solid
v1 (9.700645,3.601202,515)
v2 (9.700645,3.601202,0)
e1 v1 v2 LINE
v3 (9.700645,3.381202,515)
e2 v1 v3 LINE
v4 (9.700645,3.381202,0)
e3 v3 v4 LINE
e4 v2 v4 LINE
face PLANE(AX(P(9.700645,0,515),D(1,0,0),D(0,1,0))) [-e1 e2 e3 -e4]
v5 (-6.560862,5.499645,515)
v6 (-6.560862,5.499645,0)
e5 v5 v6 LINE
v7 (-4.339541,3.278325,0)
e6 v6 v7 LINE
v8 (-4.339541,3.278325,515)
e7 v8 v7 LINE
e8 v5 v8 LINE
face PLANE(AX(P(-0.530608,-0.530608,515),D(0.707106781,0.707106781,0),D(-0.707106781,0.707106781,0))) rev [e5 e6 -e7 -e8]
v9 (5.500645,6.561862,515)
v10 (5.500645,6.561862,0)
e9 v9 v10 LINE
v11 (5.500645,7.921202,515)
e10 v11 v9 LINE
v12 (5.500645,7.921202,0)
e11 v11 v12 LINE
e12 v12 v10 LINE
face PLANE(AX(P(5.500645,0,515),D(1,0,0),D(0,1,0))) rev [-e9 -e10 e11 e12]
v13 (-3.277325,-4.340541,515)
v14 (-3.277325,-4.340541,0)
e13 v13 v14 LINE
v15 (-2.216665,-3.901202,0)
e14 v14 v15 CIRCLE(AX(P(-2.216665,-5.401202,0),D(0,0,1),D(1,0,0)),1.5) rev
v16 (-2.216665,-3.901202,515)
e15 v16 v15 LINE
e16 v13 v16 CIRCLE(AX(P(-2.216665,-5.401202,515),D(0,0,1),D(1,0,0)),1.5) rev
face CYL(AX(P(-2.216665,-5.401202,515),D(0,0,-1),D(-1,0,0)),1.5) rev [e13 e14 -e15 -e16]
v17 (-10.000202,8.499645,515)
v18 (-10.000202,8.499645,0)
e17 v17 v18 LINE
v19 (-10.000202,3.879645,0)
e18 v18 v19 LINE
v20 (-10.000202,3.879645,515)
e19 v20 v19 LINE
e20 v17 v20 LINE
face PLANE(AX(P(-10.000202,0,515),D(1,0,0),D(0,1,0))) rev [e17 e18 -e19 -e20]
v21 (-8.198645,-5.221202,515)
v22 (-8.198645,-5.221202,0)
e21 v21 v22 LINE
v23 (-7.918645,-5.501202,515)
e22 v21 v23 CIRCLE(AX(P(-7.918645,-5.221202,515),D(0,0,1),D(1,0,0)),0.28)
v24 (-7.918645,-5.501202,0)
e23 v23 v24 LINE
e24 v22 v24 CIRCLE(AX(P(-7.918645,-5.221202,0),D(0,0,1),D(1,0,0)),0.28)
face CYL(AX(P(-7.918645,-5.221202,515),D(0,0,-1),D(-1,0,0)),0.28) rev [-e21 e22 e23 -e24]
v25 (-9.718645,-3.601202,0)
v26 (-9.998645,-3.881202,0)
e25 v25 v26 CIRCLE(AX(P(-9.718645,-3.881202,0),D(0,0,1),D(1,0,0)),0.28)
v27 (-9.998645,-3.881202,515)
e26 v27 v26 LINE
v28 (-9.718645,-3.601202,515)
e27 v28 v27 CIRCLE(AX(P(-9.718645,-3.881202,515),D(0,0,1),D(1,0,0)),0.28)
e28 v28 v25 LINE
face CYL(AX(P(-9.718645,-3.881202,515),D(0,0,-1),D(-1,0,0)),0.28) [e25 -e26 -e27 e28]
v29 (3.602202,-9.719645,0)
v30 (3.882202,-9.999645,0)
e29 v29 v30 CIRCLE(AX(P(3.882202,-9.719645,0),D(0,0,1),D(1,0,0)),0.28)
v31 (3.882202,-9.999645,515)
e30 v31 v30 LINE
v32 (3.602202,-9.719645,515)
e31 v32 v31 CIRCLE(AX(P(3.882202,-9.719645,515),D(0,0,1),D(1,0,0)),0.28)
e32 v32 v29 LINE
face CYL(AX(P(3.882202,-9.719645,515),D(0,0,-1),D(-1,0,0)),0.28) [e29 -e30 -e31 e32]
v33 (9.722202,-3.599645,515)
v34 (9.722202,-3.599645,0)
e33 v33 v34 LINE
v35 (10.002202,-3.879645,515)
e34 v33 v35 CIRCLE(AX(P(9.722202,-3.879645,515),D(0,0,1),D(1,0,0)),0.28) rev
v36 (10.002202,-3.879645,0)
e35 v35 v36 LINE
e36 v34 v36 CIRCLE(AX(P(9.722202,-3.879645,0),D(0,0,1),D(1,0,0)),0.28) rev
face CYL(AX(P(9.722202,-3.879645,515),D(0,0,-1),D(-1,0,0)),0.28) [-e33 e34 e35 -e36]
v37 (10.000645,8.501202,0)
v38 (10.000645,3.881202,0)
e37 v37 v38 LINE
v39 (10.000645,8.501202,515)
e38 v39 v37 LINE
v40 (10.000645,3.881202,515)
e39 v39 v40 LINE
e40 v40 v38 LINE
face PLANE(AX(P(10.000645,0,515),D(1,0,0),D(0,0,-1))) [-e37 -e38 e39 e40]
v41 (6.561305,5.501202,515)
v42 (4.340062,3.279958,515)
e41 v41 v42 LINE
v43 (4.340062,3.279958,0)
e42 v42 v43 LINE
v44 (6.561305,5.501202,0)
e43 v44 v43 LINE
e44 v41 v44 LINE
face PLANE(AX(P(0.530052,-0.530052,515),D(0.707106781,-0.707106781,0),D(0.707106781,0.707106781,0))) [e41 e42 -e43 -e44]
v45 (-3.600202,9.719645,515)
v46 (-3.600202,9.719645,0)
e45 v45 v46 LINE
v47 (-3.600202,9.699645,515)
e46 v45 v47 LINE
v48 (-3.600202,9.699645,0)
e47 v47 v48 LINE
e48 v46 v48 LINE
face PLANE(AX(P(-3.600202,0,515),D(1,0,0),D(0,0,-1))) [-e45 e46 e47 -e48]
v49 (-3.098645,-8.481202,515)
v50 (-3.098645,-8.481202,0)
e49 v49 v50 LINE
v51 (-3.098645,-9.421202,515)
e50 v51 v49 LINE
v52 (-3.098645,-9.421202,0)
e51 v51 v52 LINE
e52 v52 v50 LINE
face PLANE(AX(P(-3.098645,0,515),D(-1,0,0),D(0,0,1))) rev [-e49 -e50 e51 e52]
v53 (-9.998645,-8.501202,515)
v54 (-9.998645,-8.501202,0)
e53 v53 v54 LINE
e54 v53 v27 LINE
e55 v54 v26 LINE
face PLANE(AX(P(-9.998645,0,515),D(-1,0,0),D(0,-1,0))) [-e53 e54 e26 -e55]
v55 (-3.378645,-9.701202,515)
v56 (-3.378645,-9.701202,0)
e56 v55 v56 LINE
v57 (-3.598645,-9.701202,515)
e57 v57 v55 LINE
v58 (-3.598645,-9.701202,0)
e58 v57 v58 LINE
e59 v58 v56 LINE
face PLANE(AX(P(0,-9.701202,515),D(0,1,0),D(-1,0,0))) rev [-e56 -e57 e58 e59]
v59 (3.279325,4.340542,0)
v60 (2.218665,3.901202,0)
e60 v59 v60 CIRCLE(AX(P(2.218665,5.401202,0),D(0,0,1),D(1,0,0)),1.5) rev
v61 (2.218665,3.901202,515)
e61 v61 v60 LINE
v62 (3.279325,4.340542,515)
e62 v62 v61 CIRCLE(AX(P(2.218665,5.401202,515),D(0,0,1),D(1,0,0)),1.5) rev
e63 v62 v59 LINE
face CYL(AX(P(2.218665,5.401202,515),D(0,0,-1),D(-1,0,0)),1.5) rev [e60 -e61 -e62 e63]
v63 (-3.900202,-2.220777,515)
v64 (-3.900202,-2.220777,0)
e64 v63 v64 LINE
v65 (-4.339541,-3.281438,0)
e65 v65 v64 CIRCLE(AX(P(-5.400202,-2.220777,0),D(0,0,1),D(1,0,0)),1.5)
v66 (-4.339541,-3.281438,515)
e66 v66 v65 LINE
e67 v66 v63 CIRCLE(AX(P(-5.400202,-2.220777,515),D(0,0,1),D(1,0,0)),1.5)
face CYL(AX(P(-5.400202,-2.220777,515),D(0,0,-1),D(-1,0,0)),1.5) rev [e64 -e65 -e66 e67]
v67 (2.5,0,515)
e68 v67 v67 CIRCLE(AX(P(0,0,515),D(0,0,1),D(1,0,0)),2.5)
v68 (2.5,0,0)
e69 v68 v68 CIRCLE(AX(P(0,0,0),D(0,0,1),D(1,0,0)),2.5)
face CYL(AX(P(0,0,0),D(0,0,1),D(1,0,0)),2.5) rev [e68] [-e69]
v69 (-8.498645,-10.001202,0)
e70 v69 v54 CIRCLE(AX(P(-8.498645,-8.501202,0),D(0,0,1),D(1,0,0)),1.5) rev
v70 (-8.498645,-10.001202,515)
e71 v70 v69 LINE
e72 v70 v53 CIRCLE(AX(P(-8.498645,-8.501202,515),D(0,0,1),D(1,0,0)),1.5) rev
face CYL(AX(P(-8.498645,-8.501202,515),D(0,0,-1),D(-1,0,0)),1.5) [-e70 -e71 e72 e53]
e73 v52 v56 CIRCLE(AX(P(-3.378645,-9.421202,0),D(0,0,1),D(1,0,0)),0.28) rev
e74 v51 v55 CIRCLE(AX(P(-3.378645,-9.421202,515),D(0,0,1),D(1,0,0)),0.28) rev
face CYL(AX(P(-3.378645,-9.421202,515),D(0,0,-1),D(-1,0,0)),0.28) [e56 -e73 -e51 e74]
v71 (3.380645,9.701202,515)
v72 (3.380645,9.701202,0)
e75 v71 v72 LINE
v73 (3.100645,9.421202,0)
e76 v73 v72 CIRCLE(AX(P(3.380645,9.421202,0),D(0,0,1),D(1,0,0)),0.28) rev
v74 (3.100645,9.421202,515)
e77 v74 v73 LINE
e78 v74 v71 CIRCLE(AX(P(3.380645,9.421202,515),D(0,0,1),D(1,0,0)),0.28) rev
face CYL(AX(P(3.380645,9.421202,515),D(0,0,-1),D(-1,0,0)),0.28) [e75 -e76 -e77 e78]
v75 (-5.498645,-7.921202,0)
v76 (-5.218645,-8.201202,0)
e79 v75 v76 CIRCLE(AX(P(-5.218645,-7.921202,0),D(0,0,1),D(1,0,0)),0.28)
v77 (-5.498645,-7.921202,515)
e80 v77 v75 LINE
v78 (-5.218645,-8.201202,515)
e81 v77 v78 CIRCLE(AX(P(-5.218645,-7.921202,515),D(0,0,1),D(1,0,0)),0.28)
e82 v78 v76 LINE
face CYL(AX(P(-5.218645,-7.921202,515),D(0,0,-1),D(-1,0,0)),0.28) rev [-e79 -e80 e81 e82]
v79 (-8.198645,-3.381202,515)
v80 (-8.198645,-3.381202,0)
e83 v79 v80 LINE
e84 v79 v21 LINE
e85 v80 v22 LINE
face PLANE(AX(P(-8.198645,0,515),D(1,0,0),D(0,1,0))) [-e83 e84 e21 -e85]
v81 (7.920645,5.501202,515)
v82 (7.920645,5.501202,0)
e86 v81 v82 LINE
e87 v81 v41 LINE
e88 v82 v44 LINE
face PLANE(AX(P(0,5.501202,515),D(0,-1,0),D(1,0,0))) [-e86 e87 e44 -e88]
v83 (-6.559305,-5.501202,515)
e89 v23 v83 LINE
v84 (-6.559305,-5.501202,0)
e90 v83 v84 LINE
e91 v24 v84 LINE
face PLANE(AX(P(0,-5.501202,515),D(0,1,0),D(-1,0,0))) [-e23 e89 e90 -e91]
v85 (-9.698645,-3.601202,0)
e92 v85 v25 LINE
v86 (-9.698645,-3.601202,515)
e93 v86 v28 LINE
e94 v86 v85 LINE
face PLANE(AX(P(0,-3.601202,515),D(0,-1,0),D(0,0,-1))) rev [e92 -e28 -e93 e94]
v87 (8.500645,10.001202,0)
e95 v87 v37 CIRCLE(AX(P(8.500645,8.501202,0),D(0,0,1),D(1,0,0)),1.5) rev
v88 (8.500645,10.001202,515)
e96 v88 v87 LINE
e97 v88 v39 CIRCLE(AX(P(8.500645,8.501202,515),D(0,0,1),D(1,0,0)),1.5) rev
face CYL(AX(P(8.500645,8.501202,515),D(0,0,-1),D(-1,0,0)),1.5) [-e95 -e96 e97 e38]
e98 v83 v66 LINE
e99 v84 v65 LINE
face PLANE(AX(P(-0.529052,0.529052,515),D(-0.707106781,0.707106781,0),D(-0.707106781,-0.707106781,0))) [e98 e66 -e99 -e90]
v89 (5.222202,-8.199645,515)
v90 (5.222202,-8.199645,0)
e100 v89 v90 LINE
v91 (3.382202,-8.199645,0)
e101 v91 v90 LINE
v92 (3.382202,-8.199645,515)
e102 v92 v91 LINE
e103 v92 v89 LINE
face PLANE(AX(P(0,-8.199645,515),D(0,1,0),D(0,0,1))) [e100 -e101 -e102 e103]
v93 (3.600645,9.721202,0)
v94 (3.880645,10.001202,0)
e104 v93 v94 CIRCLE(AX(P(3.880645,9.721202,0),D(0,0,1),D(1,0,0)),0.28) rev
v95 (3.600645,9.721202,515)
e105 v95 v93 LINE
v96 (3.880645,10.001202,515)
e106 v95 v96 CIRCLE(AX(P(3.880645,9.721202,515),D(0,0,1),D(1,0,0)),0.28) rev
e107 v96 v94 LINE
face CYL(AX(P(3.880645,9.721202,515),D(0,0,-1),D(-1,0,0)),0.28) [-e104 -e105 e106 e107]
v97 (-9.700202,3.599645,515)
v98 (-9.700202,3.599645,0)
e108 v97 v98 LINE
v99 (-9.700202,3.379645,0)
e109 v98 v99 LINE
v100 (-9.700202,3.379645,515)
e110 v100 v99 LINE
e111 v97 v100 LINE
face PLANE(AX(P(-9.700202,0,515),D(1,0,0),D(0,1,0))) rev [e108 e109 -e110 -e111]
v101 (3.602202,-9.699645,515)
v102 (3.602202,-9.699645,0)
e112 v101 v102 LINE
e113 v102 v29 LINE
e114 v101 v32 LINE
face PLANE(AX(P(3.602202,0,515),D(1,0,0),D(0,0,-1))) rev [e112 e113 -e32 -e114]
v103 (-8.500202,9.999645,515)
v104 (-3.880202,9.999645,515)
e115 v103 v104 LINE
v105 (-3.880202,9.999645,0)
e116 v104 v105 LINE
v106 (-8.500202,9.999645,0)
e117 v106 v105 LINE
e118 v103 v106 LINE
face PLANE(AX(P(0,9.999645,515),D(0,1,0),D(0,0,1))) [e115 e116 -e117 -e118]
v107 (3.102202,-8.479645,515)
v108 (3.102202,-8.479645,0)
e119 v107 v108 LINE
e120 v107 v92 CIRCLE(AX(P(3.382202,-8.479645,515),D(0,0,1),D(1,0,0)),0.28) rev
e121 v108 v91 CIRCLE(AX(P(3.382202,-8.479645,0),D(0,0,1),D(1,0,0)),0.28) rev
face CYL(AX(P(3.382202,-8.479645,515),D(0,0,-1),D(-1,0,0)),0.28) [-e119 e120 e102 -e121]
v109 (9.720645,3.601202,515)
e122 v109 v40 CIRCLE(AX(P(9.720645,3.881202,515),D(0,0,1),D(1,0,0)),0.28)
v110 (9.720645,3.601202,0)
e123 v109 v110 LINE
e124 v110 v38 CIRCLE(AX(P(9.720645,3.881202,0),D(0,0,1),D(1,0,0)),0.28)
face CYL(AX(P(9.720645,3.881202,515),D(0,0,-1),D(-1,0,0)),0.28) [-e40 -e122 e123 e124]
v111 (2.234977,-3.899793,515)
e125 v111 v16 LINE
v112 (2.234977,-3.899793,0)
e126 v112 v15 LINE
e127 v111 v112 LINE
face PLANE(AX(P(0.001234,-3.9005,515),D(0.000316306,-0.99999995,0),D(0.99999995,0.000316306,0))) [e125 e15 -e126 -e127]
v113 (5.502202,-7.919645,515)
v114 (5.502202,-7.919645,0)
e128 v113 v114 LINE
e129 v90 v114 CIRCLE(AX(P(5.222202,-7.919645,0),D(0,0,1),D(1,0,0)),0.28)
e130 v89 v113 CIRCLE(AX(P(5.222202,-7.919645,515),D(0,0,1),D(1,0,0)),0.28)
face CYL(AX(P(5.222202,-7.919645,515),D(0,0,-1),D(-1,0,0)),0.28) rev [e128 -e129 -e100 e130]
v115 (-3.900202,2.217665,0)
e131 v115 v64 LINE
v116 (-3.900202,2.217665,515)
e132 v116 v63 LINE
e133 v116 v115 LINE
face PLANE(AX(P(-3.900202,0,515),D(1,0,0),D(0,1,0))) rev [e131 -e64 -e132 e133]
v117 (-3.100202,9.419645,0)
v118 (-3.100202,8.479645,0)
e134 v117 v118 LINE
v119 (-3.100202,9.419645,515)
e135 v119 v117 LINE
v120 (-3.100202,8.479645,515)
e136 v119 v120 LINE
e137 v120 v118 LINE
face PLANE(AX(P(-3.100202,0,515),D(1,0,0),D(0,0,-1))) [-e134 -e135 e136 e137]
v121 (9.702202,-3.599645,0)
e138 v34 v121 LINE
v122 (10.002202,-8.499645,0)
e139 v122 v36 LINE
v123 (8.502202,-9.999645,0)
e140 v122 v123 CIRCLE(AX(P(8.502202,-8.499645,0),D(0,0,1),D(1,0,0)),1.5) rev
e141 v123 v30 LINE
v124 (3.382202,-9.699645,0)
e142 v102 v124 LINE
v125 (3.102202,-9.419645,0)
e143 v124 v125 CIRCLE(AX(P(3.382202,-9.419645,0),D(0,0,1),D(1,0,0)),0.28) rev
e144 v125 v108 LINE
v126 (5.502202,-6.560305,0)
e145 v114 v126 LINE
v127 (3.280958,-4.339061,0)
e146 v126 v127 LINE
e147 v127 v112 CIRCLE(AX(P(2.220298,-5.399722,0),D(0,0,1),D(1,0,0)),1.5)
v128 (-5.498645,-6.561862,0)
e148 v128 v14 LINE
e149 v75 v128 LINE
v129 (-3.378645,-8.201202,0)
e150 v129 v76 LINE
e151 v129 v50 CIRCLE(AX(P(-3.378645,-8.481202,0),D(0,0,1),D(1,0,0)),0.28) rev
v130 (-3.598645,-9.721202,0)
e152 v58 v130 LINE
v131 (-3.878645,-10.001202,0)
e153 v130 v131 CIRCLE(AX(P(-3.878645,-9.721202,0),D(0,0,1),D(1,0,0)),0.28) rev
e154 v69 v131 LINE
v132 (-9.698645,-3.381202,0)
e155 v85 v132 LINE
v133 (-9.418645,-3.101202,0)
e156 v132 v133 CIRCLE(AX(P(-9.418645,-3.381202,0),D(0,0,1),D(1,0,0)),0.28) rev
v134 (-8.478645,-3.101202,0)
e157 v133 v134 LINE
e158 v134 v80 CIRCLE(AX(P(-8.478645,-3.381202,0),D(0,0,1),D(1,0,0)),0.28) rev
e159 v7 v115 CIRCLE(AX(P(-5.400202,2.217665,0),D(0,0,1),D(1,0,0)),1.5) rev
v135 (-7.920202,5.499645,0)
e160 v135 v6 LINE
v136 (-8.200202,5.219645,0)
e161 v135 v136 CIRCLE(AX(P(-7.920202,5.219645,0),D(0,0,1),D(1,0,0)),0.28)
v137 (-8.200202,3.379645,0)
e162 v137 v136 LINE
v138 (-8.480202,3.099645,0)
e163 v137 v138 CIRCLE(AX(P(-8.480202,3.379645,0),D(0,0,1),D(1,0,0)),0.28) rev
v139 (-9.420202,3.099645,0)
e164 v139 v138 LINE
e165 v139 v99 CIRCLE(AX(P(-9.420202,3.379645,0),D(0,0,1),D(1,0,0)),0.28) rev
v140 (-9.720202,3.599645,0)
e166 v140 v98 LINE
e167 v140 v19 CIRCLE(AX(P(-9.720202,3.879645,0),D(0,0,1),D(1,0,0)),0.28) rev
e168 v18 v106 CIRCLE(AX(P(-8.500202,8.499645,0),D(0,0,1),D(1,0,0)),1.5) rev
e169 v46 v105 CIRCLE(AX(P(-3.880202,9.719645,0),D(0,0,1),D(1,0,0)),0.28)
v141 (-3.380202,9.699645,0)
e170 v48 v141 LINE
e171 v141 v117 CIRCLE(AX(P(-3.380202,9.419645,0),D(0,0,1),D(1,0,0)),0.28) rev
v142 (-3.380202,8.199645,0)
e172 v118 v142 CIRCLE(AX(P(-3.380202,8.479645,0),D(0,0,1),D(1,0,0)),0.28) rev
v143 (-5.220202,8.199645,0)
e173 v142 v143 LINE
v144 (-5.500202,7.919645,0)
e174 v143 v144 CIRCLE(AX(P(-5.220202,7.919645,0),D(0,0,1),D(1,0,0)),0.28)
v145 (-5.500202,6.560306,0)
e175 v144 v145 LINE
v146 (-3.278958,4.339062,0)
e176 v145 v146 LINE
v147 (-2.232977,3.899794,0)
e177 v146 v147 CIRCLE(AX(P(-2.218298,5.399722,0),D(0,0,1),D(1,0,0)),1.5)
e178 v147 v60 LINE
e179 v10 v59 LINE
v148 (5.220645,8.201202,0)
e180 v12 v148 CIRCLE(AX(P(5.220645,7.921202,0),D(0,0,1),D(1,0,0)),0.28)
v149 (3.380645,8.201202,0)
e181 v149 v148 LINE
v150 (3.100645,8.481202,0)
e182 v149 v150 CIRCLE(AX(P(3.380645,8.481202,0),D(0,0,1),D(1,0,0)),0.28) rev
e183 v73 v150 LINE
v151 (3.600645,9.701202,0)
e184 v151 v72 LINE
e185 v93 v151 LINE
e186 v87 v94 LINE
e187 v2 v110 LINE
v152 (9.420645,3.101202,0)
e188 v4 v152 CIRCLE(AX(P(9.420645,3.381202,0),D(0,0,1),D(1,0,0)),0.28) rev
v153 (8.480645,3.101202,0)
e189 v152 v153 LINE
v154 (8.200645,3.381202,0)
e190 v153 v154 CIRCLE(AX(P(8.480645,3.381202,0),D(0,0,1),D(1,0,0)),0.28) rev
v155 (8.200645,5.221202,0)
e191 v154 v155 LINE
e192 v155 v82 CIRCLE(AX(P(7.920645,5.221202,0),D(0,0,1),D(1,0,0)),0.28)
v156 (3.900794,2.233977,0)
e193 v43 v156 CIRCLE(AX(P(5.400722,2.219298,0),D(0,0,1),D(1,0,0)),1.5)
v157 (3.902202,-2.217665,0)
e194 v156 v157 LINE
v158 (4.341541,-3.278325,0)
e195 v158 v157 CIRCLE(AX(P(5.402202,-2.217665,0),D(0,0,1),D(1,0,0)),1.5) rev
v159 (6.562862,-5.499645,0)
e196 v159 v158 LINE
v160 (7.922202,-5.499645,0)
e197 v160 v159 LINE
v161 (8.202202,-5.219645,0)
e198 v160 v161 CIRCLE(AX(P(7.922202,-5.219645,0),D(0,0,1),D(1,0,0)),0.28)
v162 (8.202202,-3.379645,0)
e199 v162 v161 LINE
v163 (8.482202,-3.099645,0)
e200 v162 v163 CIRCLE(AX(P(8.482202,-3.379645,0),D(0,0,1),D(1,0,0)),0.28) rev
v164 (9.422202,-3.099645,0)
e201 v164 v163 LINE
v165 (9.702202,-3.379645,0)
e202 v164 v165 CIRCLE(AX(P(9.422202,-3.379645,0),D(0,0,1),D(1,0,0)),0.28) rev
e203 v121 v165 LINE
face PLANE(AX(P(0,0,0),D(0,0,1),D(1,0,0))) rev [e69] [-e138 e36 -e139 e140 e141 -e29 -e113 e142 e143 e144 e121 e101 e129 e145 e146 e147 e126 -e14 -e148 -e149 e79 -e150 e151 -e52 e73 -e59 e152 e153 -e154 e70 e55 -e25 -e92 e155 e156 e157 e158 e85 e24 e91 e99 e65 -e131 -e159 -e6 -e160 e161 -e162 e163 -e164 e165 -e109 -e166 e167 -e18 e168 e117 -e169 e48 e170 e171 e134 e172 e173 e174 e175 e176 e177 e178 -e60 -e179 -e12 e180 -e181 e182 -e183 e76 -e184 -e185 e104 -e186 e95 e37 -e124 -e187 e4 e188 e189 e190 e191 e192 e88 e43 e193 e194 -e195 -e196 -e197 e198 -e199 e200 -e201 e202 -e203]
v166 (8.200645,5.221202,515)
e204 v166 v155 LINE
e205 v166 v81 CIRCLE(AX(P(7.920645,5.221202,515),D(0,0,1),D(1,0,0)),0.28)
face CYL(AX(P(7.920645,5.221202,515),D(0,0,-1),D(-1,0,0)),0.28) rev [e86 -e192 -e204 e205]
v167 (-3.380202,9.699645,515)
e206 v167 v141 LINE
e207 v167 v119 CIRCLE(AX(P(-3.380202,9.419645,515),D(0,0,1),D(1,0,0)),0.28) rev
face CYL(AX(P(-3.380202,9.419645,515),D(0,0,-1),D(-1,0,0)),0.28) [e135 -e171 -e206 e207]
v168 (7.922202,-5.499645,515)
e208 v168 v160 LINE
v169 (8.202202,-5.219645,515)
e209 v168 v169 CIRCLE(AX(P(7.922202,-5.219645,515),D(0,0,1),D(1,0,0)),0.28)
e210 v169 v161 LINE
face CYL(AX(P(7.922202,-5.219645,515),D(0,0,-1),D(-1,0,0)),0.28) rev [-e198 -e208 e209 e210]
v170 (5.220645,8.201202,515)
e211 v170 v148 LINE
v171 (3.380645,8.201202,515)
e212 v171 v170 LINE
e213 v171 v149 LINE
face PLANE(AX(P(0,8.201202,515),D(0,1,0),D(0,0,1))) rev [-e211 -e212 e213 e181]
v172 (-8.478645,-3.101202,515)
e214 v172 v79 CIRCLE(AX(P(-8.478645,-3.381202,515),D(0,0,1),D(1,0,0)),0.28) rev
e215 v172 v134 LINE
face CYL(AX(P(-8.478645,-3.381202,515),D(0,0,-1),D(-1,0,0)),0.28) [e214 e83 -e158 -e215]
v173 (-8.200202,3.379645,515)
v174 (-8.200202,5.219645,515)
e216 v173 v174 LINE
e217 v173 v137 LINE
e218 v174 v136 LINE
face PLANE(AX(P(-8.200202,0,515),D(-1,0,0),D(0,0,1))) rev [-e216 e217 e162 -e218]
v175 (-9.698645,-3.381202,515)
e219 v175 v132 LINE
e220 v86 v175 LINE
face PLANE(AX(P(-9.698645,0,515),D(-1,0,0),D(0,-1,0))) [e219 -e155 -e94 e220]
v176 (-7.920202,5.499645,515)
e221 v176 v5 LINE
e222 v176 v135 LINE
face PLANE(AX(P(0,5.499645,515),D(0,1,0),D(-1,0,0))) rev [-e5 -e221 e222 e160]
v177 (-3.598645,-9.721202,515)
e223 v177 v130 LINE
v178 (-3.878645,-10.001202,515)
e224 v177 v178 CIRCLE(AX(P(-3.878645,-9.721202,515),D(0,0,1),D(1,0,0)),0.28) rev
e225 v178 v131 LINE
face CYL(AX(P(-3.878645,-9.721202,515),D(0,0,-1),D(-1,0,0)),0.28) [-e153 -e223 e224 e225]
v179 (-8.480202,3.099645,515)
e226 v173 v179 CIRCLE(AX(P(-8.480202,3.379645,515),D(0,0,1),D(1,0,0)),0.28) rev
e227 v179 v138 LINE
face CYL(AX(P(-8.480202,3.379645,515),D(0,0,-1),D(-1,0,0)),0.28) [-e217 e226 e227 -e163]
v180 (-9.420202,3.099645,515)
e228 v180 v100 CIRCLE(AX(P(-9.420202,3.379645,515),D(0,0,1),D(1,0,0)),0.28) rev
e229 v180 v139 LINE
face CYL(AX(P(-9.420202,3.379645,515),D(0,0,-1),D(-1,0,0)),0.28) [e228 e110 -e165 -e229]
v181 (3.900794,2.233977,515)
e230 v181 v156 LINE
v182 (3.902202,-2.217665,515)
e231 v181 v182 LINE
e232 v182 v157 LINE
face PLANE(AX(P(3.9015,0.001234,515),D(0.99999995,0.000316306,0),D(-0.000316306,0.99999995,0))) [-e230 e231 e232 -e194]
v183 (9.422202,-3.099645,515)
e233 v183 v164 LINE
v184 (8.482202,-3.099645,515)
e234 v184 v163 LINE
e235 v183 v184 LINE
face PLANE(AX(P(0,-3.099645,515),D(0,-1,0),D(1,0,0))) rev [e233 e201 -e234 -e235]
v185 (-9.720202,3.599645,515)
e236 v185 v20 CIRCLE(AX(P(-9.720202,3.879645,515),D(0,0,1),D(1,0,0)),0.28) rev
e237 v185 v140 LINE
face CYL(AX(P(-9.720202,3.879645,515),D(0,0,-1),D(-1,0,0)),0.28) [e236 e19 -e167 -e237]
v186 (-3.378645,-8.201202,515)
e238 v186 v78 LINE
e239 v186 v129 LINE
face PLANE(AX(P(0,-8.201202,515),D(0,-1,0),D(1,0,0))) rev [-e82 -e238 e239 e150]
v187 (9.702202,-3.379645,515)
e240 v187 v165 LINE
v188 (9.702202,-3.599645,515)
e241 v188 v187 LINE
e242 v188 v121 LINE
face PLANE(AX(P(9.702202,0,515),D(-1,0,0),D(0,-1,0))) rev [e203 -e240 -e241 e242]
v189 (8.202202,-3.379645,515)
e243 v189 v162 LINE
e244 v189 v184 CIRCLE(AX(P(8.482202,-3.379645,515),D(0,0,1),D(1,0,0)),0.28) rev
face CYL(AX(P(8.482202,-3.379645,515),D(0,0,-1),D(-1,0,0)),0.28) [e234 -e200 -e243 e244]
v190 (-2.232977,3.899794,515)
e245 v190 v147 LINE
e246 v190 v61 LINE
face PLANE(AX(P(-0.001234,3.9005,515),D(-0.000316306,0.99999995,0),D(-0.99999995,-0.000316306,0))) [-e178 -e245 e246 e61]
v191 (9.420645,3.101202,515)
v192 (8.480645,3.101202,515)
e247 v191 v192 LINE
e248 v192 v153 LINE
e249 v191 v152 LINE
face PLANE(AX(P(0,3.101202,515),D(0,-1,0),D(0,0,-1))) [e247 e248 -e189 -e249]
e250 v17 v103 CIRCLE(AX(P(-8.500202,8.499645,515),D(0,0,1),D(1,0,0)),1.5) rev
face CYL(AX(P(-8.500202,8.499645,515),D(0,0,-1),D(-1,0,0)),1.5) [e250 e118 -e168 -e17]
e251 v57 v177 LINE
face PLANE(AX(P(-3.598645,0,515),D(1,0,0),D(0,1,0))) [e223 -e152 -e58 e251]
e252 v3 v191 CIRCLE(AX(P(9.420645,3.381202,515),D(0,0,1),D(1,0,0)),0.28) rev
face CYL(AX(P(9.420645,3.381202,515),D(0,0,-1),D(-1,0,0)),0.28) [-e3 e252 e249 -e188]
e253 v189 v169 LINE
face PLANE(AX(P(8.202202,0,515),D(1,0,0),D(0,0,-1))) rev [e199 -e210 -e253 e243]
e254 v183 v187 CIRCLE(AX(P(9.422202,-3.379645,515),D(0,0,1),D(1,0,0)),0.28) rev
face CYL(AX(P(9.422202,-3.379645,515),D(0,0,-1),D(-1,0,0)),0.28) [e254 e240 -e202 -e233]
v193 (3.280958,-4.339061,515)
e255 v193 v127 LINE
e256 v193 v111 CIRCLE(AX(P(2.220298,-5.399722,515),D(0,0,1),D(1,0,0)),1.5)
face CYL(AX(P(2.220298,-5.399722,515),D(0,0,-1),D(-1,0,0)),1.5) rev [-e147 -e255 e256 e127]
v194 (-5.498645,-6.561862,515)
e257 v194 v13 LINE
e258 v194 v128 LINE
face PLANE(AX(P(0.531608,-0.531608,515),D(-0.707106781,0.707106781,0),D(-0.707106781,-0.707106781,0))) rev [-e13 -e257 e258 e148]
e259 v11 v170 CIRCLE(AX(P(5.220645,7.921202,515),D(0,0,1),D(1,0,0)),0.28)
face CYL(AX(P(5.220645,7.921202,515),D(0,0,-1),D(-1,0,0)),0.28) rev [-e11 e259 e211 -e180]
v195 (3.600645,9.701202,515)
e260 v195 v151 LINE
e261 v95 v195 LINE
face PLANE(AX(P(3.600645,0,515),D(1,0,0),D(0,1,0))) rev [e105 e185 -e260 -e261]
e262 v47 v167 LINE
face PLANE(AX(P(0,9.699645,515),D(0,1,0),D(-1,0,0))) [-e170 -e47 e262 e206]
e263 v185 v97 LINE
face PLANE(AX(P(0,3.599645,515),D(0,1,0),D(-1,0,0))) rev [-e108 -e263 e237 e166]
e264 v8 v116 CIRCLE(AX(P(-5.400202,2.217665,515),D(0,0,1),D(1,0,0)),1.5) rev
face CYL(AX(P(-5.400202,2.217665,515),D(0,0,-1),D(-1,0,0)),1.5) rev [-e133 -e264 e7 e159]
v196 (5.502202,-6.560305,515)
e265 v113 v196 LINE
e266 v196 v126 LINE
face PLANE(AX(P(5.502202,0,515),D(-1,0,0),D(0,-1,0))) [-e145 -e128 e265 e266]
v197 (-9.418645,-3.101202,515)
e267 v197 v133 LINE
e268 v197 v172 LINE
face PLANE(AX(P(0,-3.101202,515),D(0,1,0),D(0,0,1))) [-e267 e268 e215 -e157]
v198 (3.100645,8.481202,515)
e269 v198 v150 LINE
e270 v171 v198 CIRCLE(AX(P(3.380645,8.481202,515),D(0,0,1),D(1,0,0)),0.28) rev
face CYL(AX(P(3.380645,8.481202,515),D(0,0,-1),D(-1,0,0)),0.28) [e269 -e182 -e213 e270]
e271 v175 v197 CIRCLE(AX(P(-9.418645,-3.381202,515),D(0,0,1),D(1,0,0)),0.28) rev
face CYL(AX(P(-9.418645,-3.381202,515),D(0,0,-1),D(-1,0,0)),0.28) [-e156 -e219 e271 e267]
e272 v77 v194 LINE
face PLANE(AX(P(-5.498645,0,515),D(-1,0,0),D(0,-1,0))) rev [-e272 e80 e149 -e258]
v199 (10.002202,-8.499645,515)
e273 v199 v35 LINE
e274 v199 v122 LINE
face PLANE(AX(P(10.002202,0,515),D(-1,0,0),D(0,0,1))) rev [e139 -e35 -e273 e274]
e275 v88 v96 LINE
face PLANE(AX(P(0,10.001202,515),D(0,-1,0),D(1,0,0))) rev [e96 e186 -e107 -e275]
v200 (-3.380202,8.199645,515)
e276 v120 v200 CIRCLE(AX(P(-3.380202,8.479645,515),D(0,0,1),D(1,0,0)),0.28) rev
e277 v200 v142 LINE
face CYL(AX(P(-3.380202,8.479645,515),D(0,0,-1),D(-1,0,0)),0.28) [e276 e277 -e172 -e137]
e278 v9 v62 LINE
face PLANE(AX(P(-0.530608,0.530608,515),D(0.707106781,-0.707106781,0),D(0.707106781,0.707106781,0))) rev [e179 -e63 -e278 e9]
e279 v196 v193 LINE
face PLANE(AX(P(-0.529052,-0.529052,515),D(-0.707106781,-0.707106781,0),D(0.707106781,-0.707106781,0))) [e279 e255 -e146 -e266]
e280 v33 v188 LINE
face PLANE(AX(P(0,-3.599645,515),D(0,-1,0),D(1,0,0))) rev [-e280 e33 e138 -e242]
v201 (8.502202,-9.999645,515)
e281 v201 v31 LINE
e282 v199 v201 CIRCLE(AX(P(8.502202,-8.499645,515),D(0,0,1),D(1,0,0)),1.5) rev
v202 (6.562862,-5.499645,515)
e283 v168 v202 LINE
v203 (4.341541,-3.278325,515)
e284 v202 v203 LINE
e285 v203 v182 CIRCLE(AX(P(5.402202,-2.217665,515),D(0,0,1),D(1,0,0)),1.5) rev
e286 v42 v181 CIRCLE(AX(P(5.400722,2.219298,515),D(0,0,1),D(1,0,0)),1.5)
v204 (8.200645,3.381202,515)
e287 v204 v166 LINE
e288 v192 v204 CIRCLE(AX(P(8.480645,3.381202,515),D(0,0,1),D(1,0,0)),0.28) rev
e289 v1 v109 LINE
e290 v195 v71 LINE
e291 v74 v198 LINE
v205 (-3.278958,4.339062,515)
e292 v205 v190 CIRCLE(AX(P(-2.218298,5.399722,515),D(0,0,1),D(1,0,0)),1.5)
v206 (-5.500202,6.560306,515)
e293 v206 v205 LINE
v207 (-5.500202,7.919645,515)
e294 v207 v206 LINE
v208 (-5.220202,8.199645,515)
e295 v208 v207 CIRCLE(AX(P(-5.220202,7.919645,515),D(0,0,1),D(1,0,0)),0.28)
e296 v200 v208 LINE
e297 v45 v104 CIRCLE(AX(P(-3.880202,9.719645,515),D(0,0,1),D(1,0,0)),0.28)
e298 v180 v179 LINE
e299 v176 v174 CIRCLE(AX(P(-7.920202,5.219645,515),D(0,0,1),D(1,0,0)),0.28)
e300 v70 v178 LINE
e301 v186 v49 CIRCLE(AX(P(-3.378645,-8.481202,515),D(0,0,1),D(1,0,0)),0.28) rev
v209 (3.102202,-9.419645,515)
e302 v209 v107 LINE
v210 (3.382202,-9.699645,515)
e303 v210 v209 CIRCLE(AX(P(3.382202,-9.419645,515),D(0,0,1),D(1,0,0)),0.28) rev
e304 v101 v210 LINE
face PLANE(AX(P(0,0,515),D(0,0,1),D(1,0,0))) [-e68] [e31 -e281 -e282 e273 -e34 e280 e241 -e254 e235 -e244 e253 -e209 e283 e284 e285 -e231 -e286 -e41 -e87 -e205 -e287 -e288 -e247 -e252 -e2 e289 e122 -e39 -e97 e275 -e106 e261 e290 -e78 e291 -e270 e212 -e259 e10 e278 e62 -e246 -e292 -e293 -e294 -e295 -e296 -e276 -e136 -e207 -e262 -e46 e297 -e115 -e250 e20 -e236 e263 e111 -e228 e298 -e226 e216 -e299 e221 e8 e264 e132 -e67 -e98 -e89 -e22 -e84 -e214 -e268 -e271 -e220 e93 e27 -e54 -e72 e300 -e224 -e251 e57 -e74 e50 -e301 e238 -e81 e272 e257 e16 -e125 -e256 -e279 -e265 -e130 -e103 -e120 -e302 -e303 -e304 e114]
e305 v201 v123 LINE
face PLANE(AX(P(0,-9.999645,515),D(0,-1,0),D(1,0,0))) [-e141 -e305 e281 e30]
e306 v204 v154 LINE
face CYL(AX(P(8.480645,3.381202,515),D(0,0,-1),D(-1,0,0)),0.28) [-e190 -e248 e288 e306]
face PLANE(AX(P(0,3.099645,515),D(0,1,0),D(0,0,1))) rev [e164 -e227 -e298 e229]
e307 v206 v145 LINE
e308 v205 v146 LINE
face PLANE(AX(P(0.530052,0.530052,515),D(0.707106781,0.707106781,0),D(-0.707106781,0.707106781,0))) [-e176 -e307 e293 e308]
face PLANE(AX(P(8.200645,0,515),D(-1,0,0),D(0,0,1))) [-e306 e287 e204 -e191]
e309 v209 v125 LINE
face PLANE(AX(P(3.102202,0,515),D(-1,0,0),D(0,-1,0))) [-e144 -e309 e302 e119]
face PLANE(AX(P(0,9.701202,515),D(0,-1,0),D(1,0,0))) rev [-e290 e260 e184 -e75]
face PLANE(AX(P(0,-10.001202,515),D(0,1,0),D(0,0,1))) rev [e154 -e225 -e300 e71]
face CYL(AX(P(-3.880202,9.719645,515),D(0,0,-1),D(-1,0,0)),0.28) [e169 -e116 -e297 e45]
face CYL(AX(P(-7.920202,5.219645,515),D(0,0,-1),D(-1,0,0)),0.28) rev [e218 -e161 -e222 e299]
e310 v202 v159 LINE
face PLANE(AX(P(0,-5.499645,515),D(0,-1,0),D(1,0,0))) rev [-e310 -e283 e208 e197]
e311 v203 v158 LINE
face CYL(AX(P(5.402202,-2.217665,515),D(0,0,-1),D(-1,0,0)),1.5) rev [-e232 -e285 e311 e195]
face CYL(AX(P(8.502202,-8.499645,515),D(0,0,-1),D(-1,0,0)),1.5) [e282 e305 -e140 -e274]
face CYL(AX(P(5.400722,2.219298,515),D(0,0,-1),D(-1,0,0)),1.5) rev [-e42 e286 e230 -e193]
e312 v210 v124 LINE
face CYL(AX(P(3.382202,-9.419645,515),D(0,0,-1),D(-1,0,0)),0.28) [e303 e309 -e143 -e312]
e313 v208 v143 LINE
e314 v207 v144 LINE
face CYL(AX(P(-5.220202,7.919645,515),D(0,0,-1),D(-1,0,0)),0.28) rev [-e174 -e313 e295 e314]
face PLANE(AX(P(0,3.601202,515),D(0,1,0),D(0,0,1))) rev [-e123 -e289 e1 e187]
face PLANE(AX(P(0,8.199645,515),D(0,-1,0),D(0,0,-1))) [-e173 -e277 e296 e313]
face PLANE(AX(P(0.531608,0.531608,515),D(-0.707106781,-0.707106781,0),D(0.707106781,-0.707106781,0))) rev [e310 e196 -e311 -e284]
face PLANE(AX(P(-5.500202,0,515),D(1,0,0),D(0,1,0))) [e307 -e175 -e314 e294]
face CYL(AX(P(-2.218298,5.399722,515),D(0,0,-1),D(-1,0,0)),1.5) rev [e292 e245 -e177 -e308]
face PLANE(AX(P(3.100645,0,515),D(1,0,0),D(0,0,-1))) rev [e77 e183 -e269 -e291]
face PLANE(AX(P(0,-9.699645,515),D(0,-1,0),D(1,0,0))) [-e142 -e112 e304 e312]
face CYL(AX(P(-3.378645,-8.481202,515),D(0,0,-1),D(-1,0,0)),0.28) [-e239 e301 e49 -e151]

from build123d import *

# Parameters (mm, degrees)
BOSS_EXTRUDE1_DEPTH = 515
F_3DSKETCH2_R       = 2.5
CUT_EXTRUDE1_DEPTH  = 516.194204233


with BuildPart() as part:
    # Sketch1 → Boss-Extrude1 (new body)
    with BuildSketch(Plane.XY):
        with BuildLine():
            ThreePointArc((-4.339541497, 3.27832502), (-4.01438237, 2.791689997), (-3.900201668, 2.217664848))
            Line((-3.900201668, 2.217664848), (-3.900201668, -2.220777458))
            ThreePointArc((-3.900201668, -2.220777458), (-4.013982246, -2.793835668), (-4.338062619, -3.279956687))
            ThreePointArc((-4.338062619, -3.279956687), (-4.338801799, -3.280697416), (-4.339541497, -3.28143763))
            Line((-4.339541497, -3.28143763), (-6.559305445, -5.501201578))
            Line((-6.559305445, -5.501201578), (-7.918645273, -5.501201578))
            ThreePointArc((-7.918645273, -5.501201578), (-8.116635172, -5.419191476), (-8.198645273, -5.221201578))
            Line((-8.198645273, -5.221201578), (-8.198645273, -3.381201578))
            ThreePointArc((-8.198645273, -3.381201578), (-8.280655374, -3.183211679), (-8.478645273, -3.101201578))
            Line((-8.478645273, -3.101201578), (-9.418645273, -3.101201578))
            ThreePointArc((-9.418645273, -3.101201578), (-9.616635172, -3.183211679), (-9.698645273, -3.381201578))
            Line((-9.698645273, -3.381201578), (-9.698645273, -3.601201578))
            Line((-9.698645273, -3.601201578), (-9.718645273, -3.601201578))
            ThreePointArc((-9.718645273, -3.601201578), (-9.916635172, -3.683211679), (-9.998645273, -3.881201578))
            Line((-9.998645273, -3.881201578), (-9.998645273, -8.501201578))
            ThreePointArc((-9.998645273, -8.501201578), (-9.559305445, -9.561861749), (-8.498645273, -10.001201578))
            Line((-8.498645273, -10.001201578), (-3.878645273, -10.001201578))
            ThreePointArc((-3.878645273, -10.001201578), (-3.680655374, -9.919191476), (-3.598645273, -9.721201578))
            Line((-3.598645273, -9.721201578), (-3.598645273, -9.701201578))
            Line((-3.598645273, -9.701201578), (-3.378645273, -9.701201578))
            ThreePointArc((-3.378645273, -9.701201578), (-3.180655374, -9.619191476), (-3.098645273, -9.421201578))
            Line((-3.098645273, -9.421201578), (-3.098645273, -8.481201578))
            ThreePointArc((-3.098645273, -8.481201578), (-3.180655374, -8.283211679), (-3.378645273, -8.201201578))
            Line((-3.378645273, -8.201201578), (-5.218645273, -8.201201578))
            ThreePointArc((-5.218645273, -8.201201578), (-5.416635172, -8.119191476), (-5.498645273, -7.921201578))
            Line((-5.498645273, -7.921201578), (-5.498645273, -6.561861749))
            Line((-5.498645273, -6.561861749), (-3.277324929, -4.340541406))
            ThreePointArc((-3.277324929, -4.340541406), (-2.790689906, -4.015382279), (-2.216664757, -3.901201578))
            Line((-2.216664757, -3.901201578), (2.234977304, -3.899793498))
            ThreePointArc((2.234977304, -3.899793498), (2.801097117, -4.016727825), (3.280957809, -4.339061494))
            Line((3.280957809, -4.339061494), (5.502201668, -6.560305354))
            Line((5.502201668, -6.560305354), (5.502201668, -7.919645182))
            ThreePointArc((5.502201668, -7.919645182), (5.420191567, -8.117635081), (5.222201668, -8.199645182))
            Line((5.222201668, -8.199645182), (3.382201668, -8.199645182))
            ThreePointArc((3.382201668, -8.199645182), (3.18421177, -8.281655283), (3.102201668, -8.479645182))
            Line((3.102201668, -8.479645182), (3.102201668, -9.419645182))
            ThreePointArc((3.102201668, -9.419645182), (3.18421177, -9.617635081), (3.382201668, -9.699645182))
            Line((3.382201668, -9.699645182), (3.602201668, -9.699645182))
            Line((3.602201668, -9.699645182), (3.602201668, -9.719645182))
            ThreePointArc((3.602201668, -9.719645182), (3.68421177, -9.917635081), (3.882201668, -9.999645182))
            Line((3.882201668, -9.999645182), (8.502201668, -9.999645182))
            ThreePointArc((8.502201668, -9.999645182), (9.56286184, -9.560305354), (10.002201668, -8.499645182))
            Line((10.002201668, -8.499645182), (10.002201668, -3.879645182))
            ThreePointArc((10.002201668, -3.879645182), (9.920191567, -3.681655283), (9.722201668, -3.599645182))
            Line((9.722201668, -3.599645182), (9.702201668, -3.599645182))
            Line((9.702201668, -3.599645182), (9.702201668, -3.379645182))
            ThreePointArc((9.702201668, -3.379645182), (9.620191567, -3.181655283), (9.422201668, -3.099645182))
            Line((9.422201668, -3.099645182), (8.482201668, -3.099645182))
            ThreePointArc((8.482201668, -3.099645182), (8.28421177, -3.181655283), (8.202201668, -3.379645182))
            Line((8.202201668, -3.379645182), (8.202201668, -5.219645182))
            ThreePointArc((8.202201668, -5.219645182), (8.120191567, -5.417635081), (7.922201668, -5.499645182))
            Line((7.922201668, -5.499645182), (6.56286184, -5.499645182))
            Line((6.56286184, -5.499645182), (4.341541497, -3.278324838))
            ThreePointArc((4.341541497, -3.278324838), (4.01638237, -2.791689815), (3.902201668, -2.217664667))
            Line((3.902201668, -2.217664667), (3.900793589, 2.233977395))
            ThreePointArc((3.900793589, 2.233977395), (4.017727916, 2.800097207), (4.340061585, 3.2799579))
            Line((4.340061585, 3.2799579), (6.561305445, 5.501201759))
            Line((6.561305445, 5.501201759), (7.920645273, 5.501201759))
            ThreePointArc((7.920645273, 5.501201759), (8.118635172, 5.419191658), (8.200645273, 5.221201759))
            Line((8.200645273, 5.221201759), (8.200645273, 3.381201759))
            ThreePointArc((8.200645273, 3.381201759), (8.282655374, 3.183211861), (8.480645273, 3.101201759))
            Line((8.480645273, 3.101201759), (9.420645273, 3.101201759))
            ThreePointArc((9.420645273, 3.101201759), (9.618635172, 3.183211861), (9.700645273, 3.381201759))
            Line((9.700645273, 3.381201759), (9.700645273, 3.601201759))
            Line((9.700645273, 3.601201759), (9.720645273, 3.601201759))
            ThreePointArc((9.720645273, 3.601201759), (9.918635172, 3.683211861), (10.000645273, 3.881201759))
            Line((10.000645273, 3.881201759), (10.000645273, 8.501201759))
            ThreePointArc((10.000645273, 8.501201759), (9.561305445, 9.561861931), (8.500645273, 10.001201759))
            Line((8.500645273, 10.001201759), (3.880645273, 10.001201759))
            ThreePointArc((3.880645273, 10.001201759), (3.682655374, 9.919191658), (3.600645273, 9.721201759))
            Line((3.600645273, 9.721201759), (3.600645273, 9.701201759))
            Line((3.600645273, 9.701201759), (3.380645273, 9.701201759))
            ThreePointArc((3.380645273, 9.701201759), (3.182655374, 9.619191658), (3.100645273, 9.421201759))
            Line((3.100645273, 9.421201759), (3.100645273, 8.481201759))
            ThreePointArc((3.100645273, 8.481201759), (3.182655374, 8.283211861), (3.380645273, 8.201201759))
            Line((3.380645273, 8.201201759), (5.220645273, 8.201201759))
            ThreePointArc((5.220645273, 8.201201759), (5.418635172, 8.119191658), (5.500645273, 7.921201759))
            Line((5.500645273, 7.921201759), (5.500645273, 6.561861931))
            Line((5.500645273, 6.561861931), (3.279324929, 4.340541588))
            ThreePointArc((3.279324929, 4.340541588), (2.792689906, 4.015382461), (2.218664757, 3.901201759))
            Line((2.218664757, 3.901201759), (-2.232977304, 3.89979368))
            ThreePointArc((-2.232977304, 3.89979368), (-2.799097117, 4.016728006), (-3.278957809, 4.339061676))
            Line((-3.278957809, 4.339061676), (-5.500201668, 6.560305535))
            Line((-5.500201668, 6.560305535), (-5.500201668, 7.919645364))
            ThreePointArc((-5.500201668, 7.919645364), (-5.418191567, 8.117635262), (-5.220201668, 8.199645364))
            Line((-5.220201668, 8.199645364), (-3.380201668, 8.199645364))
            ThreePointArc((-3.380201668, 8.199645364), (-3.18221177, 8.281655465), (-3.100201668, 8.479645364))
            Line((-3.100201668, 8.479645364), (-3.100201668, 9.419645364))
            ThreePointArc((-3.100201668, 9.419645364), (-3.18221177, 9.617635262), (-3.380201668, 9.699645364))
            Line((-3.380201668, 9.699645364), (-3.600201668, 9.699645364))
            Line((-3.600201668, 9.699645364), (-3.600201668, 9.719645364))
            ThreePointArc((-3.600201668, 9.719645364), (-3.68221177, 9.917635262), (-3.880201668, 9.999645364))
            Line((-3.880201668, 9.999645364), (-8.500201668, 9.999645364))
            ThreePointArc((-8.500201668, 9.999645364), (-9.56086184, 9.560305535), (-10.000201668, 8.499645364))
            Line((-10.000201668, 8.499645364), (-10.000201668, 3.879645364))
            ThreePointArc((-10.000201668, 3.879645364), (-9.918191567, 3.681655465), (-9.720201668, 3.599645364))
            Line((-9.720201668, 3.599645364), (-9.700201668, 3.599645364))
            Line((-9.700201668, 3.599645364), (-9.700201668, 3.379645364))
            ThreePointArc((-9.700201668, 3.379645364), (-9.618191567, 3.181655465), (-9.420201668, 3.099645364))
            Line((-9.420201668, 3.099645364), (-8.480201668, 3.099645364))
            ThreePointArc((-8.480201668, 3.099645364), (-8.28221177, 3.181655465), (-8.200201668, 3.379645364))
            Line((-8.200201668, 3.379645364), (-8.200201668, 5.219645364))
            ThreePointArc((-8.200201668, 5.219645364), (-8.118191567, 5.417635262), (-7.920201668, 5.499645364))
            Line((-7.920201668, 5.499645364), (-6.56086184, 5.499645364))
            Line((-6.56086184, 5.499645364), (-4.339541497, 3.27832502))
        make_face()
    extrude(amount=BOSS_EXTRUDE1_DEPTH)

    # 3DSketch2 → Cut-Extrude1 (cut, through all)
    with BuildSketch(Plane.XY):
        Circle(F_3DSKETCH2_R)
    extrude(amount=CUT_EXTRUDE1_DEPTH, mode=Mode.SUBTRACT)


solid = part.part
